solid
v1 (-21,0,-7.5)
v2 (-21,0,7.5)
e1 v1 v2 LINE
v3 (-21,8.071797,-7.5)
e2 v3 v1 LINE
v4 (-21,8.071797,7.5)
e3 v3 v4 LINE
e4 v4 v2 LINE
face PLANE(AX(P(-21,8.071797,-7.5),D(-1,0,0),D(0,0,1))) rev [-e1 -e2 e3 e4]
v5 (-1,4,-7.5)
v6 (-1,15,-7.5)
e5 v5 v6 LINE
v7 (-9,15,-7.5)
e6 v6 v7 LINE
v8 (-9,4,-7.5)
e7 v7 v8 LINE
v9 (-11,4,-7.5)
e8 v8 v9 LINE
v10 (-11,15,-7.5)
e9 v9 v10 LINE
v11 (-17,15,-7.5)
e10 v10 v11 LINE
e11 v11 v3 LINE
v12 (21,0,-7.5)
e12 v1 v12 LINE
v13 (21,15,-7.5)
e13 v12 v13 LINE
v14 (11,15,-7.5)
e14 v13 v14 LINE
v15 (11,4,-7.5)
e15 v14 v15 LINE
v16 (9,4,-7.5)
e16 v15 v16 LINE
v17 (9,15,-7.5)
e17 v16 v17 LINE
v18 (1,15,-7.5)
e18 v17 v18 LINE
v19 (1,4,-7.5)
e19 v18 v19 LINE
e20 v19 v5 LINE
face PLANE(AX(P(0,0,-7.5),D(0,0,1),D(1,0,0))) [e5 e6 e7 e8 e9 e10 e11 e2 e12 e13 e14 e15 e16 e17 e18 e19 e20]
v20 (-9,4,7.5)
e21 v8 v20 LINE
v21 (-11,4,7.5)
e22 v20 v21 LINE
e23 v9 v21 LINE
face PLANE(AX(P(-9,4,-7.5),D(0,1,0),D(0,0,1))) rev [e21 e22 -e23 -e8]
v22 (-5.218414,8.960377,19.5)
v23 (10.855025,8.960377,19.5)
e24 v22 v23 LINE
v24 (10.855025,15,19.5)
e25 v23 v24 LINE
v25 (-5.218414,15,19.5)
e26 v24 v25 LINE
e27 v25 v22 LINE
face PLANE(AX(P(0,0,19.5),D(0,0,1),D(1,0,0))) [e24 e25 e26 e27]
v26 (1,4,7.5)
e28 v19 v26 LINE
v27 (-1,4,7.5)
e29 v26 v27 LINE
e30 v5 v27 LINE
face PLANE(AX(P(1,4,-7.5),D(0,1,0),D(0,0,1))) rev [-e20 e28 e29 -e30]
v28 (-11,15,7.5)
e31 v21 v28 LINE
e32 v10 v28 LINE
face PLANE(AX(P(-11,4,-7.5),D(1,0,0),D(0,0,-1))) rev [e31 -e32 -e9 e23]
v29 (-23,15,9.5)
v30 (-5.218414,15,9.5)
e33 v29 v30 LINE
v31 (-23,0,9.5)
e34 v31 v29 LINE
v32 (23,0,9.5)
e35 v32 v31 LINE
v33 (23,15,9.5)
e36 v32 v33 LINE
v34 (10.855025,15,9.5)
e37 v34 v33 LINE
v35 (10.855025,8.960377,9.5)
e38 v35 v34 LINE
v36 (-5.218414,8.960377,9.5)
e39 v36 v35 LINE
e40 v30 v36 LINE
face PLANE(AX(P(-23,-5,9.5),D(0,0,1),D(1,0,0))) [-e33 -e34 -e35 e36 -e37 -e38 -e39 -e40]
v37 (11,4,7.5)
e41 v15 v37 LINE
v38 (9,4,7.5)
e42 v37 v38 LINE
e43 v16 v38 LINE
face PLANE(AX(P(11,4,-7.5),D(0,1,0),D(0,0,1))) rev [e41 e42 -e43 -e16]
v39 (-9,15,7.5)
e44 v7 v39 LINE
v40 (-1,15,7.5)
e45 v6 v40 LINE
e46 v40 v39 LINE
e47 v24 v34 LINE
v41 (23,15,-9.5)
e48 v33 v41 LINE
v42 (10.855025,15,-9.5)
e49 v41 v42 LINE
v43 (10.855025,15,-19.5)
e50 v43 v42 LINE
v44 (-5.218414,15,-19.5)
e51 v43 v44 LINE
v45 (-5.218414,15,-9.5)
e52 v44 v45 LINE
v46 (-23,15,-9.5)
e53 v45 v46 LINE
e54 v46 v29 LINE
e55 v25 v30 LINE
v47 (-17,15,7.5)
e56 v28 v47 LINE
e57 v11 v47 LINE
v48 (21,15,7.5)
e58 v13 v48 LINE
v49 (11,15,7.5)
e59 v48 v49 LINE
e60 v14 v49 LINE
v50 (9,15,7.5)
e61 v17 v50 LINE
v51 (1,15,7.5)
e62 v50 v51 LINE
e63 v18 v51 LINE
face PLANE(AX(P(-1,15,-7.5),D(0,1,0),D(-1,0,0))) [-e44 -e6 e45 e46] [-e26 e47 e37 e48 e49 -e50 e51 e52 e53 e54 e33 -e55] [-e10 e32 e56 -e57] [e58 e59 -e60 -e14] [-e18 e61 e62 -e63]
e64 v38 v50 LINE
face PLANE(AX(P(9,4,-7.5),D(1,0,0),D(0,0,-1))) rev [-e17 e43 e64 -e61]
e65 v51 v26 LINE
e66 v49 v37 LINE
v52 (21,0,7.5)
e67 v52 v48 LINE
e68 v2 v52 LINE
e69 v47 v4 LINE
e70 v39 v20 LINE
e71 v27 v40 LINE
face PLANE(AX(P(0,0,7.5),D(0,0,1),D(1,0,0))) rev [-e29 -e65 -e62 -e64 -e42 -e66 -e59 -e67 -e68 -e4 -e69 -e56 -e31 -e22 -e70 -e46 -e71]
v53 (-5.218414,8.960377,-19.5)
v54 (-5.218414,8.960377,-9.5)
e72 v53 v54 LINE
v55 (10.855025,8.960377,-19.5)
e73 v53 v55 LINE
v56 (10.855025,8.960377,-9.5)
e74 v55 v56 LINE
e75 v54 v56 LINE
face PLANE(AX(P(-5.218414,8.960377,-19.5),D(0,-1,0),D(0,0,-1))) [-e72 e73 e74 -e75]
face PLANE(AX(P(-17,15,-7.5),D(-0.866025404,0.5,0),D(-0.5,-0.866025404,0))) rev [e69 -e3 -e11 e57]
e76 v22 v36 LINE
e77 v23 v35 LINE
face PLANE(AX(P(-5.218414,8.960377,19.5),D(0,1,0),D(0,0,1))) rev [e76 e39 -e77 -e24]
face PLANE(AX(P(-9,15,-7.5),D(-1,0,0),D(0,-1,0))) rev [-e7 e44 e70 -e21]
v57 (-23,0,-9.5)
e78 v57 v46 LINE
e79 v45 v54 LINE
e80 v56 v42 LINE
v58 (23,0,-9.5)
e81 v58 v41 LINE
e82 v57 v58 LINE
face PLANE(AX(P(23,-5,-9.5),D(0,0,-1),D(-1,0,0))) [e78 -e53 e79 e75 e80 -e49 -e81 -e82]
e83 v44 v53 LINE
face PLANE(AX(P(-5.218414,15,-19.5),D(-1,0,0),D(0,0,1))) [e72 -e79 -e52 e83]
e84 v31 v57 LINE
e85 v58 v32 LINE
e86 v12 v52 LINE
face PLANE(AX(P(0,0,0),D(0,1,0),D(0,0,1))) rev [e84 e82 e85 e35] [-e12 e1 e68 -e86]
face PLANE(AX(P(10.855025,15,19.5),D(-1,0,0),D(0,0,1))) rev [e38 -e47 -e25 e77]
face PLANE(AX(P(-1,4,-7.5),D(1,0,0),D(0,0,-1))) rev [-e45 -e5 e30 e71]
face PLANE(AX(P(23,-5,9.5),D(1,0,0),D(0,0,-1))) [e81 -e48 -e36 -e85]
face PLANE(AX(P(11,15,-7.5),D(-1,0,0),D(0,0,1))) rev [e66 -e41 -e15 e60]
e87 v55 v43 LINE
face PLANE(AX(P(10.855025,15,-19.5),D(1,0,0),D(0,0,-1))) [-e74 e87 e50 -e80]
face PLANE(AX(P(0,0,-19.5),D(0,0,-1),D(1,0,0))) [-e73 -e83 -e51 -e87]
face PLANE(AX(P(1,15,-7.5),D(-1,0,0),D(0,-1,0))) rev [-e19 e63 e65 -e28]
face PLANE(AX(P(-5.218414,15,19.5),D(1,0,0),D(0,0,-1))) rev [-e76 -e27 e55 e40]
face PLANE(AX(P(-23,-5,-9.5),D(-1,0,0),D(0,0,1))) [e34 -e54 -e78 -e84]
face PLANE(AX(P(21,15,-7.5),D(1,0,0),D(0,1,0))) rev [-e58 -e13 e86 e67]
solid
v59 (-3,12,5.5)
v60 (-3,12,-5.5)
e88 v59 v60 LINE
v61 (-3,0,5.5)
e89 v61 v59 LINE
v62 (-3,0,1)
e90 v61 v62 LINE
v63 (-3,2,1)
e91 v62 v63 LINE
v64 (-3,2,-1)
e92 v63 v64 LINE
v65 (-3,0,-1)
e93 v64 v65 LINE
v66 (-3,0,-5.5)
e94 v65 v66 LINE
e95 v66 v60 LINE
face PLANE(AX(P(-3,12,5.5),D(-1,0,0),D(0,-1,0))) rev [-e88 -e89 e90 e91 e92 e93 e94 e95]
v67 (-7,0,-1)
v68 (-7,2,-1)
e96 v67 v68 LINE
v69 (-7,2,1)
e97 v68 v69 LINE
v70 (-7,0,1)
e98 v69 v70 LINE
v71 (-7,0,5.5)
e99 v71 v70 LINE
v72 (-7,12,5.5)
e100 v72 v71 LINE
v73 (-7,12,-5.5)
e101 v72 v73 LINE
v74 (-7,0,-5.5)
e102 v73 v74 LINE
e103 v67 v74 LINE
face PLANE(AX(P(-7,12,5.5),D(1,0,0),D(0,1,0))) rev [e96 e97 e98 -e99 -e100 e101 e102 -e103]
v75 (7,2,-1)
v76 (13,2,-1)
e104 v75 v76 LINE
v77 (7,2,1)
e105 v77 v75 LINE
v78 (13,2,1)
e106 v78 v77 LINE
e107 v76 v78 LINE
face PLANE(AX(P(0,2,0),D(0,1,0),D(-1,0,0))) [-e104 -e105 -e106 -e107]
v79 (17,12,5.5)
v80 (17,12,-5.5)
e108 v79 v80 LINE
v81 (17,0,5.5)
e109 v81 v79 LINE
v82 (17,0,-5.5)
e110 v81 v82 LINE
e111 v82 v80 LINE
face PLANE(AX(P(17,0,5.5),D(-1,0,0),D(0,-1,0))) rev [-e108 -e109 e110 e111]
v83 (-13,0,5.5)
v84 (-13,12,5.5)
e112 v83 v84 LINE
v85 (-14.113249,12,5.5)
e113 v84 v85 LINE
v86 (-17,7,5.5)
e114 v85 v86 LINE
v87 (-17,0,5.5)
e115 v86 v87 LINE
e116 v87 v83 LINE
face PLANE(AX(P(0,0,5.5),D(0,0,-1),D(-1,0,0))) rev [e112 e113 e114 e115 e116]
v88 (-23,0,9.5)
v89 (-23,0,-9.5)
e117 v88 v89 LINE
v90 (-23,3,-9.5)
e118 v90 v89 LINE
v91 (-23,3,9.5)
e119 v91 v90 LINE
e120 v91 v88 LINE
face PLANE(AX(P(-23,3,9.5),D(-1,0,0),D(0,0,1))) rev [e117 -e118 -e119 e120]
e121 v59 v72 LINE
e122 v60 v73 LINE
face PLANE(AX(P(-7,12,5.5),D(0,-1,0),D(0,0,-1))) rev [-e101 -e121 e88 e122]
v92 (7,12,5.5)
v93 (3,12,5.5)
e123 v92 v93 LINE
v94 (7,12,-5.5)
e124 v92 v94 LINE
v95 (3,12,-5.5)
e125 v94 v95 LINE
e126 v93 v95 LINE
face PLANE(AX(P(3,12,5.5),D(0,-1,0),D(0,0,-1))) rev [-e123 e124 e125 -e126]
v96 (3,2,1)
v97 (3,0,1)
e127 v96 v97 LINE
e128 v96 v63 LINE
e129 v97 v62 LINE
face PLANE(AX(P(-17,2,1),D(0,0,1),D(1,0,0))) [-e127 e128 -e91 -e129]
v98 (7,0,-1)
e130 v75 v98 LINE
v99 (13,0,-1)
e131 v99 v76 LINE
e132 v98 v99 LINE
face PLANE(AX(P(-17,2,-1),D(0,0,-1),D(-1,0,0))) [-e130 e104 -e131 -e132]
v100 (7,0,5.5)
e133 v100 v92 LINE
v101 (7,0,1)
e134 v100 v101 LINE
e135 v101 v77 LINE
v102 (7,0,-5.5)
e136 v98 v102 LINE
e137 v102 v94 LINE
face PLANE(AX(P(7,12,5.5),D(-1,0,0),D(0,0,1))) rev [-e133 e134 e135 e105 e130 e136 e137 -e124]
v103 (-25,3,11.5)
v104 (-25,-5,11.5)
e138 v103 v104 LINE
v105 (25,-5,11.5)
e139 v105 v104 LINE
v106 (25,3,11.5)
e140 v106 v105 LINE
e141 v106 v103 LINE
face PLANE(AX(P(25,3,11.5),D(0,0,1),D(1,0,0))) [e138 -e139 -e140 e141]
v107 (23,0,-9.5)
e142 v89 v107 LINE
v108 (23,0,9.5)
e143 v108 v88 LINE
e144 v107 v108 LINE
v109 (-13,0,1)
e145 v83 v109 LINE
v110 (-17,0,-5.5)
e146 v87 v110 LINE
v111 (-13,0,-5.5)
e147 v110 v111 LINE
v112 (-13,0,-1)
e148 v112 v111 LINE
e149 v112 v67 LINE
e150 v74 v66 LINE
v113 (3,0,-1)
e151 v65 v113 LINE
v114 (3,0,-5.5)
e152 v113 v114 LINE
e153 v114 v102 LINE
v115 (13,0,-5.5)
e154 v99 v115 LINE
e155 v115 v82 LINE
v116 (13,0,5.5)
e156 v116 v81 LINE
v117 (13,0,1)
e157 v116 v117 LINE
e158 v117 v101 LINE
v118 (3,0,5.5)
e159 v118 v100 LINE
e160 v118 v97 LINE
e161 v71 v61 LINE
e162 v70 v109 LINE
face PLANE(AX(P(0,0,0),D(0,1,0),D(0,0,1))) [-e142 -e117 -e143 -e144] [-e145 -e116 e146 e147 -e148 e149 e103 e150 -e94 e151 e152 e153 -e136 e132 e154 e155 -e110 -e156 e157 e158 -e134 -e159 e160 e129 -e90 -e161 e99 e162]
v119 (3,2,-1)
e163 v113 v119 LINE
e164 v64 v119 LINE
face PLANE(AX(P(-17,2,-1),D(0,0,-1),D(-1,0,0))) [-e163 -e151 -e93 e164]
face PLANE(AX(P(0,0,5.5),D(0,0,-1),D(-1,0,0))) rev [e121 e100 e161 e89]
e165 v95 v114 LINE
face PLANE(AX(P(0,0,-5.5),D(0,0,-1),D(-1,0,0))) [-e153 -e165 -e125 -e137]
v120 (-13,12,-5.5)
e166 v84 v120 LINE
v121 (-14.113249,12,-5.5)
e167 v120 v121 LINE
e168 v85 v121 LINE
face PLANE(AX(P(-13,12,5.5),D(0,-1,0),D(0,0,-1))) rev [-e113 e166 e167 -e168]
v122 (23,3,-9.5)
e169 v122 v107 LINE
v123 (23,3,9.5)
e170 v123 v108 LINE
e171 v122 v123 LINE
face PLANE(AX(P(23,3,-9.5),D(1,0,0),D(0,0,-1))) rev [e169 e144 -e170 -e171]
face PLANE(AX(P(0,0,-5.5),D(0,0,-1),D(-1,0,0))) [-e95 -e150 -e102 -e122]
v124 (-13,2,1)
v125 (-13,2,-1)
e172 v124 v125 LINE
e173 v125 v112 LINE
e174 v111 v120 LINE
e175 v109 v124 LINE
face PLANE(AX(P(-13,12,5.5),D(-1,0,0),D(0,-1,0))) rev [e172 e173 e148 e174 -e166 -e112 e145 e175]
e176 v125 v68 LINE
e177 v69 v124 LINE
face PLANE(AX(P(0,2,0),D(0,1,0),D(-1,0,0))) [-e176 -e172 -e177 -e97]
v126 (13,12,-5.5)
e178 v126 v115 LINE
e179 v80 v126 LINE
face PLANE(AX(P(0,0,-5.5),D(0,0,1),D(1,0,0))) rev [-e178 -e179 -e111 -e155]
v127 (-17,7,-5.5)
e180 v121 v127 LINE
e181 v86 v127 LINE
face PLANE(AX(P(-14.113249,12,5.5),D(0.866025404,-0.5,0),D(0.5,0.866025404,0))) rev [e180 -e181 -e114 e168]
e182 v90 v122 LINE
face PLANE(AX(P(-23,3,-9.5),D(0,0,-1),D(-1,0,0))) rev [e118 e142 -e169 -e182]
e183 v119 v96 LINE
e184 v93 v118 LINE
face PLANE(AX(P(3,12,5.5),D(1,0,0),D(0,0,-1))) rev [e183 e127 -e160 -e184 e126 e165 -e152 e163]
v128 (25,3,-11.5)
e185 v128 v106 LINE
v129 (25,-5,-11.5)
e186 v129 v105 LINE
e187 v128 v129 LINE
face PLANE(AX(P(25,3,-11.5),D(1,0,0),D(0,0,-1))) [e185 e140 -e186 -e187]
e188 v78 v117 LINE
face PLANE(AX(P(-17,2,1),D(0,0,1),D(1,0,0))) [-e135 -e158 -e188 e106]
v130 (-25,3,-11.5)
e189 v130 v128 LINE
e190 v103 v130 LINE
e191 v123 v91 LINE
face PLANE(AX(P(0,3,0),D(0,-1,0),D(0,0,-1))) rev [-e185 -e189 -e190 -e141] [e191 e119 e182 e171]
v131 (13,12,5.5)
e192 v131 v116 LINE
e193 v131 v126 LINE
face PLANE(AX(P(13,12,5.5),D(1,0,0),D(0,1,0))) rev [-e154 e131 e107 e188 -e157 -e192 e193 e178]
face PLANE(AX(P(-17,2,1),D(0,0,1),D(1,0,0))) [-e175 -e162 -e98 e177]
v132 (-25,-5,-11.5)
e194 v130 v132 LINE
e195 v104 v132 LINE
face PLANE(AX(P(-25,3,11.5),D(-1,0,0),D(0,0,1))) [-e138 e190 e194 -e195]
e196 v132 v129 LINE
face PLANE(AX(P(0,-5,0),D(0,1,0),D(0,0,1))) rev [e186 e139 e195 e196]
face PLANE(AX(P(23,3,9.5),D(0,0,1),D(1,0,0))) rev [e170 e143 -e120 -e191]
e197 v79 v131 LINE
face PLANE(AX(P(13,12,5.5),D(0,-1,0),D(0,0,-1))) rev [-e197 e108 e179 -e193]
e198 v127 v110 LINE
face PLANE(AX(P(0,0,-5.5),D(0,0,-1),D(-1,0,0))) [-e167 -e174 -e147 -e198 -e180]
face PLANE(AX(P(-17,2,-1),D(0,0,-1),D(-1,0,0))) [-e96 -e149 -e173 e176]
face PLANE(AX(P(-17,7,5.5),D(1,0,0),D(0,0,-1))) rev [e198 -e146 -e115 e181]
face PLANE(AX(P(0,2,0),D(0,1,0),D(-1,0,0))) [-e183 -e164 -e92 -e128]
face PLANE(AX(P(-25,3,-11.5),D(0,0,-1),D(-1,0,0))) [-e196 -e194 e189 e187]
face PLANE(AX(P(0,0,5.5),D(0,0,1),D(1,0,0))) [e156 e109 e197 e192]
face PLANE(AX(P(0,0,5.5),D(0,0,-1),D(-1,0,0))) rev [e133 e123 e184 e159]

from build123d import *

# Parameters (mm, degrees)
BOSS_EXTRUDE1_DEPTH      = 7.5
BOSS_EXTRUDE1_DEPTH_BACK = 7.5
CUT_EXTRUDE1_DEPTH       = 5.5
CUT_EXTRUDE1_DEPTH_BACK  = 5.5
SKETCH2_W                = 4
SKETCH2_H                = 12
SKETCH3_W                = 34
SKETCH3_H                = 2
CUT_EXTRUDE2_DEPTH       = 2
BOSS_EXTRUDE2_DEPTH      = 15
BOSS_EXTRUDE2_DEPTH_BACK = 5
SKETCH4_W                = 46
SKETCH4_H                = 19
SPLIT1_START             = -5
SPLIT1_OUTLINE_W         = 46
SPLIT1_OUTLINE_H         = 19
SPLIT1_DEPTH             = 5
SPLIT1_2_OUTLINE_W       = 4
SPLIT1_2_OUTLINE_H       = 11
SPLIT1_2_DEPTH           = 12
SPLIT1_3_OUTLINE_W       = 6
SPLIT1_3_OUTLINE_H       = 2
SPLIT1_3_DEPTH           = 2
SPLIT1_START_2           = -5.5
SPLIT1_4_DEPTH           = 11
SPLIT1_START_3           = -9.5
SPLIT1_5_OUTLINE_W       = 46
SPLIT1_5_OUTLINE_H       = 5
SPLIT1_5_DEPTH           = 19
SPLIT1_START_4           = -1
SPLIT1_6_OUTLINE_W       = 6
SPLIT1_6_OUTLINE_H       = 2
SPLIT1_6_DEPTH           = 2
SKETCH5_W                = 16.073439162
SKETCH5_H                = 6.039622656
BOSS_EXTRUDE3_DEPTH      = 10
SKETCH6_W                = 50
SKETCH6_H                = 23
SKETCH6_W_2              = 46
SKETCH6_H_2              = 19
BOSS_EXTRUDE4_DEPTH      = 8


# Read off the part's stored shape, not the designer's step: Split1
with BuildPart() as part:
    # Sketch1 → Boss-Extrude1 (new, two sides: drawn at the far end of the back side and taken through both)
    with BuildSketch(Plane.XY.offset(-BOSS_EXTRUDE1_DEPTH_BACK)):
        Polygon((-21, 0), (21, 0), (21, 15), (11, 15), (11, 4), (9, 4), (9, 15), (1, 15), (1, 4), (-1, 4), (-1, 15), (-9, 15), (-9, 4), (-11, 4), (-11, 15), (-17, 15), (-21, 8.07179677), align=None)
    extrude(amount=BOSS_EXTRUDE1_DEPTH + BOSS_EXTRUDE1_DEPTH_BACK)

    # Sketch2 → Cut-Extrude1 (cut, two sides: drawn at the far end of the back side and taken through both)
    with BuildSketch(Plane.XY.offset(-CUT_EXTRUDE1_DEPTH_BACK)):
        with Locations((15, 6)):
            Rectangle(SKETCH2_W, SKETCH2_H)
        Polygon((-13, 12), (-13, 0), (-17, 0), (-17, 7), (-14.113248654, 12), align=None)
        with Locations((-5, 6)):
            Rectangle(SKETCH2_W, SKETCH2_H)
        with Locations((5, 6)):
            Rectangle(SKETCH2_W, SKETCH2_H)
    extrude(amount=CUT_EXTRUDE1_DEPTH + CUT_EXTRUDE1_DEPTH_BACK, mode=Mode.SUBTRACT)

    # Sketch3 → Cut-Extrude2 (cut)
    with BuildSketch(Plane(origin=(0, 0, 0), x_dir=(-1, 0, 0), z_dir=(0, -1, 0))):
        Rectangle(SKETCH3_W, SKETCH3_H)
    extrude(amount=-CUT_EXTRUDE2_DEPTH, mode=Mode.SUBTRACT)


with BuildPart() as body_2:
    # Sketch4 → Boss-Extrude2 (new, two sides: drawn at the far end of the back side and taken through both)
    with BuildSketch(Plane(origin=(0, 0, 0), x_dir=(1, 0, 0), z_dir=(0, 1, 0)).offset(-BOSS_EXTRUDE2_DEPTH_BACK)):
        Rectangle(SKETCH4_W, SKETCH4_H)
    extrude(amount=BOSS_EXTRUDE2_DEPTH + BOSS_EXTRUDE2_DEPTH_BACK)

    # Combine1: cut part
    add(part.part, mode=Mode.SUBTRACT)

    # Split1 outline → Split1 (cut)
    with BuildSketch(Plane(origin=(0, 0, 0), x_dir=(1, 0, 0), z_dir=(0, 1, 0)).offset(SPLIT1_START)):
        Rectangle(SPLIT1_OUTLINE_W, SPLIT1_OUTLINE_H)
    extrude(amount=SPLIT1_DEPTH, mode=Mode.SUBTRACT)

    # Split1 2 outline → Split1 2 (cut)
    with BuildSketch(Plane(origin=(0, 0, 0), x_dir=(1, 0, 0), z_dir=(0, 1, 0))):
        with Locations((-15, 0)):
            Rectangle(SPLIT1_2_OUTLINE_W, SPLIT1_2_OUTLINE_H)
        with Locations((-5, 0)):
            Rectangle(SPLIT1_2_OUTLINE_W, SPLIT1_2_OUTLINE_H)
        with Locations((5, 0)):
            Rectangle(SPLIT1_2_OUTLINE_W, SPLIT1_2_OUTLINE_H)
        with Locations((15, 0)):
            Rectangle(SPLIT1_2_OUTLINE_W, SPLIT1_2_OUTLINE_H)
    extrude(amount=SPLIT1_2_DEPTH, mode=Mode.SUBTRACT)

    # Split1 3 outline → Split1 3 (cut)
    with BuildSketch(Plane(origin=(0, 0, 0), x_dir=(1, 0, 0), z_dir=(0, 1, 0))):
        with Locations((-10, 0)):
            Rectangle(SPLIT1_3_OUTLINE_W, SPLIT1_3_OUTLINE_H)
        Rectangle(SPLIT1_3_OUTLINE_W, SPLIT1_3_OUTLINE_H)
        with Locations((10, 0)):
            Rectangle(SPLIT1_3_OUTLINE_W, SPLIT1_3_OUTLINE_H)
    extrude(amount=SPLIT1_3_DEPTH, mode=Mode.SUBTRACT)

    # Sketch5 → Boss-Extrude3 (add)
    with BuildSketch(Plane.XY.offset(9.5)):
        with Locations((2.818305229, 11.980188672)):
            Rectangle(SKETCH5_W, SKETCH5_H)
    boss_extrude3 = extrude(amount=BOSS_EXTRUDE3_DEPTH)

    # Mirror1: Boss-Extrude3 across plane
    add(boss_extrude3.mirror(Plane.XY))


with BuildPart() as body_2_2:
    # Split1 4 outline → Split1 4 (new body)
    with BuildSketch(Plane.XY.offset(SPLIT1_START_2)):
        Polygon((17, 0), (17, 12), (13, 12), (13, 0), (7, 0), (7, 12), (3, 12), (3, 0), (-3, 0), (-3, 12), (-7, 12), (-7, 0), (-13, 0), (-13, 12), (-14.113248654, 12), (-17, 7), (-17, 0), (-23, 0), (-23, -5), (23, -5), (23, 0), align=None)
    extrude(amount=SPLIT1_4_DEPTH)

    # Split1 5 outline → Split1 5 (add)
    with BuildSketch(Plane.XY.offset(SPLIT1_START_3)):
        with Locations((0, -2.5)):
            Rectangle(SPLIT1_5_OUTLINE_W, SPLIT1_5_OUTLINE_H)
    extrude(amount=SPLIT1_5_DEPTH)

    # Split1 6 outline → Split1 6 (add)
    with BuildSketch(Plane.XY.offset(SPLIT1_START_4)):
        with Locations((10, 1)):
            Rectangle(SPLIT1_6_OUTLINE_W, SPLIT1_6_OUTLINE_H)
        with Locations((0, 1)):
            Rectangle(SPLIT1_6_OUTLINE_W, SPLIT1_6_OUTLINE_H)
        with Locations((-10, 1)):
            Rectangle(SPLIT1_6_OUTLINE_W, SPLIT1_6_OUTLINE_H)
    extrude(amount=SPLIT1_6_DEPTH)


with BuildPart() as body_3:
    # Sketch6 → Boss-Extrude4 (new body)
    with BuildSketch(Plane.XZ.offset(5)):
        Rectangle(SKETCH6_W, SKETCH6_H)
        Rectangle(SKETCH6_W_2, SKETCH6_H_2, mode=Mode.SUBTRACT)
    extrude(amount=-BOSS_EXTRUDE4_DEPTH)


with BuildPart() as body_2_2_1:
    add(body_2_2.part)

    # Combine2: union body 3
    add(body_3.part)


solid = Compound([body_2.part, body_2_2_1.part])
